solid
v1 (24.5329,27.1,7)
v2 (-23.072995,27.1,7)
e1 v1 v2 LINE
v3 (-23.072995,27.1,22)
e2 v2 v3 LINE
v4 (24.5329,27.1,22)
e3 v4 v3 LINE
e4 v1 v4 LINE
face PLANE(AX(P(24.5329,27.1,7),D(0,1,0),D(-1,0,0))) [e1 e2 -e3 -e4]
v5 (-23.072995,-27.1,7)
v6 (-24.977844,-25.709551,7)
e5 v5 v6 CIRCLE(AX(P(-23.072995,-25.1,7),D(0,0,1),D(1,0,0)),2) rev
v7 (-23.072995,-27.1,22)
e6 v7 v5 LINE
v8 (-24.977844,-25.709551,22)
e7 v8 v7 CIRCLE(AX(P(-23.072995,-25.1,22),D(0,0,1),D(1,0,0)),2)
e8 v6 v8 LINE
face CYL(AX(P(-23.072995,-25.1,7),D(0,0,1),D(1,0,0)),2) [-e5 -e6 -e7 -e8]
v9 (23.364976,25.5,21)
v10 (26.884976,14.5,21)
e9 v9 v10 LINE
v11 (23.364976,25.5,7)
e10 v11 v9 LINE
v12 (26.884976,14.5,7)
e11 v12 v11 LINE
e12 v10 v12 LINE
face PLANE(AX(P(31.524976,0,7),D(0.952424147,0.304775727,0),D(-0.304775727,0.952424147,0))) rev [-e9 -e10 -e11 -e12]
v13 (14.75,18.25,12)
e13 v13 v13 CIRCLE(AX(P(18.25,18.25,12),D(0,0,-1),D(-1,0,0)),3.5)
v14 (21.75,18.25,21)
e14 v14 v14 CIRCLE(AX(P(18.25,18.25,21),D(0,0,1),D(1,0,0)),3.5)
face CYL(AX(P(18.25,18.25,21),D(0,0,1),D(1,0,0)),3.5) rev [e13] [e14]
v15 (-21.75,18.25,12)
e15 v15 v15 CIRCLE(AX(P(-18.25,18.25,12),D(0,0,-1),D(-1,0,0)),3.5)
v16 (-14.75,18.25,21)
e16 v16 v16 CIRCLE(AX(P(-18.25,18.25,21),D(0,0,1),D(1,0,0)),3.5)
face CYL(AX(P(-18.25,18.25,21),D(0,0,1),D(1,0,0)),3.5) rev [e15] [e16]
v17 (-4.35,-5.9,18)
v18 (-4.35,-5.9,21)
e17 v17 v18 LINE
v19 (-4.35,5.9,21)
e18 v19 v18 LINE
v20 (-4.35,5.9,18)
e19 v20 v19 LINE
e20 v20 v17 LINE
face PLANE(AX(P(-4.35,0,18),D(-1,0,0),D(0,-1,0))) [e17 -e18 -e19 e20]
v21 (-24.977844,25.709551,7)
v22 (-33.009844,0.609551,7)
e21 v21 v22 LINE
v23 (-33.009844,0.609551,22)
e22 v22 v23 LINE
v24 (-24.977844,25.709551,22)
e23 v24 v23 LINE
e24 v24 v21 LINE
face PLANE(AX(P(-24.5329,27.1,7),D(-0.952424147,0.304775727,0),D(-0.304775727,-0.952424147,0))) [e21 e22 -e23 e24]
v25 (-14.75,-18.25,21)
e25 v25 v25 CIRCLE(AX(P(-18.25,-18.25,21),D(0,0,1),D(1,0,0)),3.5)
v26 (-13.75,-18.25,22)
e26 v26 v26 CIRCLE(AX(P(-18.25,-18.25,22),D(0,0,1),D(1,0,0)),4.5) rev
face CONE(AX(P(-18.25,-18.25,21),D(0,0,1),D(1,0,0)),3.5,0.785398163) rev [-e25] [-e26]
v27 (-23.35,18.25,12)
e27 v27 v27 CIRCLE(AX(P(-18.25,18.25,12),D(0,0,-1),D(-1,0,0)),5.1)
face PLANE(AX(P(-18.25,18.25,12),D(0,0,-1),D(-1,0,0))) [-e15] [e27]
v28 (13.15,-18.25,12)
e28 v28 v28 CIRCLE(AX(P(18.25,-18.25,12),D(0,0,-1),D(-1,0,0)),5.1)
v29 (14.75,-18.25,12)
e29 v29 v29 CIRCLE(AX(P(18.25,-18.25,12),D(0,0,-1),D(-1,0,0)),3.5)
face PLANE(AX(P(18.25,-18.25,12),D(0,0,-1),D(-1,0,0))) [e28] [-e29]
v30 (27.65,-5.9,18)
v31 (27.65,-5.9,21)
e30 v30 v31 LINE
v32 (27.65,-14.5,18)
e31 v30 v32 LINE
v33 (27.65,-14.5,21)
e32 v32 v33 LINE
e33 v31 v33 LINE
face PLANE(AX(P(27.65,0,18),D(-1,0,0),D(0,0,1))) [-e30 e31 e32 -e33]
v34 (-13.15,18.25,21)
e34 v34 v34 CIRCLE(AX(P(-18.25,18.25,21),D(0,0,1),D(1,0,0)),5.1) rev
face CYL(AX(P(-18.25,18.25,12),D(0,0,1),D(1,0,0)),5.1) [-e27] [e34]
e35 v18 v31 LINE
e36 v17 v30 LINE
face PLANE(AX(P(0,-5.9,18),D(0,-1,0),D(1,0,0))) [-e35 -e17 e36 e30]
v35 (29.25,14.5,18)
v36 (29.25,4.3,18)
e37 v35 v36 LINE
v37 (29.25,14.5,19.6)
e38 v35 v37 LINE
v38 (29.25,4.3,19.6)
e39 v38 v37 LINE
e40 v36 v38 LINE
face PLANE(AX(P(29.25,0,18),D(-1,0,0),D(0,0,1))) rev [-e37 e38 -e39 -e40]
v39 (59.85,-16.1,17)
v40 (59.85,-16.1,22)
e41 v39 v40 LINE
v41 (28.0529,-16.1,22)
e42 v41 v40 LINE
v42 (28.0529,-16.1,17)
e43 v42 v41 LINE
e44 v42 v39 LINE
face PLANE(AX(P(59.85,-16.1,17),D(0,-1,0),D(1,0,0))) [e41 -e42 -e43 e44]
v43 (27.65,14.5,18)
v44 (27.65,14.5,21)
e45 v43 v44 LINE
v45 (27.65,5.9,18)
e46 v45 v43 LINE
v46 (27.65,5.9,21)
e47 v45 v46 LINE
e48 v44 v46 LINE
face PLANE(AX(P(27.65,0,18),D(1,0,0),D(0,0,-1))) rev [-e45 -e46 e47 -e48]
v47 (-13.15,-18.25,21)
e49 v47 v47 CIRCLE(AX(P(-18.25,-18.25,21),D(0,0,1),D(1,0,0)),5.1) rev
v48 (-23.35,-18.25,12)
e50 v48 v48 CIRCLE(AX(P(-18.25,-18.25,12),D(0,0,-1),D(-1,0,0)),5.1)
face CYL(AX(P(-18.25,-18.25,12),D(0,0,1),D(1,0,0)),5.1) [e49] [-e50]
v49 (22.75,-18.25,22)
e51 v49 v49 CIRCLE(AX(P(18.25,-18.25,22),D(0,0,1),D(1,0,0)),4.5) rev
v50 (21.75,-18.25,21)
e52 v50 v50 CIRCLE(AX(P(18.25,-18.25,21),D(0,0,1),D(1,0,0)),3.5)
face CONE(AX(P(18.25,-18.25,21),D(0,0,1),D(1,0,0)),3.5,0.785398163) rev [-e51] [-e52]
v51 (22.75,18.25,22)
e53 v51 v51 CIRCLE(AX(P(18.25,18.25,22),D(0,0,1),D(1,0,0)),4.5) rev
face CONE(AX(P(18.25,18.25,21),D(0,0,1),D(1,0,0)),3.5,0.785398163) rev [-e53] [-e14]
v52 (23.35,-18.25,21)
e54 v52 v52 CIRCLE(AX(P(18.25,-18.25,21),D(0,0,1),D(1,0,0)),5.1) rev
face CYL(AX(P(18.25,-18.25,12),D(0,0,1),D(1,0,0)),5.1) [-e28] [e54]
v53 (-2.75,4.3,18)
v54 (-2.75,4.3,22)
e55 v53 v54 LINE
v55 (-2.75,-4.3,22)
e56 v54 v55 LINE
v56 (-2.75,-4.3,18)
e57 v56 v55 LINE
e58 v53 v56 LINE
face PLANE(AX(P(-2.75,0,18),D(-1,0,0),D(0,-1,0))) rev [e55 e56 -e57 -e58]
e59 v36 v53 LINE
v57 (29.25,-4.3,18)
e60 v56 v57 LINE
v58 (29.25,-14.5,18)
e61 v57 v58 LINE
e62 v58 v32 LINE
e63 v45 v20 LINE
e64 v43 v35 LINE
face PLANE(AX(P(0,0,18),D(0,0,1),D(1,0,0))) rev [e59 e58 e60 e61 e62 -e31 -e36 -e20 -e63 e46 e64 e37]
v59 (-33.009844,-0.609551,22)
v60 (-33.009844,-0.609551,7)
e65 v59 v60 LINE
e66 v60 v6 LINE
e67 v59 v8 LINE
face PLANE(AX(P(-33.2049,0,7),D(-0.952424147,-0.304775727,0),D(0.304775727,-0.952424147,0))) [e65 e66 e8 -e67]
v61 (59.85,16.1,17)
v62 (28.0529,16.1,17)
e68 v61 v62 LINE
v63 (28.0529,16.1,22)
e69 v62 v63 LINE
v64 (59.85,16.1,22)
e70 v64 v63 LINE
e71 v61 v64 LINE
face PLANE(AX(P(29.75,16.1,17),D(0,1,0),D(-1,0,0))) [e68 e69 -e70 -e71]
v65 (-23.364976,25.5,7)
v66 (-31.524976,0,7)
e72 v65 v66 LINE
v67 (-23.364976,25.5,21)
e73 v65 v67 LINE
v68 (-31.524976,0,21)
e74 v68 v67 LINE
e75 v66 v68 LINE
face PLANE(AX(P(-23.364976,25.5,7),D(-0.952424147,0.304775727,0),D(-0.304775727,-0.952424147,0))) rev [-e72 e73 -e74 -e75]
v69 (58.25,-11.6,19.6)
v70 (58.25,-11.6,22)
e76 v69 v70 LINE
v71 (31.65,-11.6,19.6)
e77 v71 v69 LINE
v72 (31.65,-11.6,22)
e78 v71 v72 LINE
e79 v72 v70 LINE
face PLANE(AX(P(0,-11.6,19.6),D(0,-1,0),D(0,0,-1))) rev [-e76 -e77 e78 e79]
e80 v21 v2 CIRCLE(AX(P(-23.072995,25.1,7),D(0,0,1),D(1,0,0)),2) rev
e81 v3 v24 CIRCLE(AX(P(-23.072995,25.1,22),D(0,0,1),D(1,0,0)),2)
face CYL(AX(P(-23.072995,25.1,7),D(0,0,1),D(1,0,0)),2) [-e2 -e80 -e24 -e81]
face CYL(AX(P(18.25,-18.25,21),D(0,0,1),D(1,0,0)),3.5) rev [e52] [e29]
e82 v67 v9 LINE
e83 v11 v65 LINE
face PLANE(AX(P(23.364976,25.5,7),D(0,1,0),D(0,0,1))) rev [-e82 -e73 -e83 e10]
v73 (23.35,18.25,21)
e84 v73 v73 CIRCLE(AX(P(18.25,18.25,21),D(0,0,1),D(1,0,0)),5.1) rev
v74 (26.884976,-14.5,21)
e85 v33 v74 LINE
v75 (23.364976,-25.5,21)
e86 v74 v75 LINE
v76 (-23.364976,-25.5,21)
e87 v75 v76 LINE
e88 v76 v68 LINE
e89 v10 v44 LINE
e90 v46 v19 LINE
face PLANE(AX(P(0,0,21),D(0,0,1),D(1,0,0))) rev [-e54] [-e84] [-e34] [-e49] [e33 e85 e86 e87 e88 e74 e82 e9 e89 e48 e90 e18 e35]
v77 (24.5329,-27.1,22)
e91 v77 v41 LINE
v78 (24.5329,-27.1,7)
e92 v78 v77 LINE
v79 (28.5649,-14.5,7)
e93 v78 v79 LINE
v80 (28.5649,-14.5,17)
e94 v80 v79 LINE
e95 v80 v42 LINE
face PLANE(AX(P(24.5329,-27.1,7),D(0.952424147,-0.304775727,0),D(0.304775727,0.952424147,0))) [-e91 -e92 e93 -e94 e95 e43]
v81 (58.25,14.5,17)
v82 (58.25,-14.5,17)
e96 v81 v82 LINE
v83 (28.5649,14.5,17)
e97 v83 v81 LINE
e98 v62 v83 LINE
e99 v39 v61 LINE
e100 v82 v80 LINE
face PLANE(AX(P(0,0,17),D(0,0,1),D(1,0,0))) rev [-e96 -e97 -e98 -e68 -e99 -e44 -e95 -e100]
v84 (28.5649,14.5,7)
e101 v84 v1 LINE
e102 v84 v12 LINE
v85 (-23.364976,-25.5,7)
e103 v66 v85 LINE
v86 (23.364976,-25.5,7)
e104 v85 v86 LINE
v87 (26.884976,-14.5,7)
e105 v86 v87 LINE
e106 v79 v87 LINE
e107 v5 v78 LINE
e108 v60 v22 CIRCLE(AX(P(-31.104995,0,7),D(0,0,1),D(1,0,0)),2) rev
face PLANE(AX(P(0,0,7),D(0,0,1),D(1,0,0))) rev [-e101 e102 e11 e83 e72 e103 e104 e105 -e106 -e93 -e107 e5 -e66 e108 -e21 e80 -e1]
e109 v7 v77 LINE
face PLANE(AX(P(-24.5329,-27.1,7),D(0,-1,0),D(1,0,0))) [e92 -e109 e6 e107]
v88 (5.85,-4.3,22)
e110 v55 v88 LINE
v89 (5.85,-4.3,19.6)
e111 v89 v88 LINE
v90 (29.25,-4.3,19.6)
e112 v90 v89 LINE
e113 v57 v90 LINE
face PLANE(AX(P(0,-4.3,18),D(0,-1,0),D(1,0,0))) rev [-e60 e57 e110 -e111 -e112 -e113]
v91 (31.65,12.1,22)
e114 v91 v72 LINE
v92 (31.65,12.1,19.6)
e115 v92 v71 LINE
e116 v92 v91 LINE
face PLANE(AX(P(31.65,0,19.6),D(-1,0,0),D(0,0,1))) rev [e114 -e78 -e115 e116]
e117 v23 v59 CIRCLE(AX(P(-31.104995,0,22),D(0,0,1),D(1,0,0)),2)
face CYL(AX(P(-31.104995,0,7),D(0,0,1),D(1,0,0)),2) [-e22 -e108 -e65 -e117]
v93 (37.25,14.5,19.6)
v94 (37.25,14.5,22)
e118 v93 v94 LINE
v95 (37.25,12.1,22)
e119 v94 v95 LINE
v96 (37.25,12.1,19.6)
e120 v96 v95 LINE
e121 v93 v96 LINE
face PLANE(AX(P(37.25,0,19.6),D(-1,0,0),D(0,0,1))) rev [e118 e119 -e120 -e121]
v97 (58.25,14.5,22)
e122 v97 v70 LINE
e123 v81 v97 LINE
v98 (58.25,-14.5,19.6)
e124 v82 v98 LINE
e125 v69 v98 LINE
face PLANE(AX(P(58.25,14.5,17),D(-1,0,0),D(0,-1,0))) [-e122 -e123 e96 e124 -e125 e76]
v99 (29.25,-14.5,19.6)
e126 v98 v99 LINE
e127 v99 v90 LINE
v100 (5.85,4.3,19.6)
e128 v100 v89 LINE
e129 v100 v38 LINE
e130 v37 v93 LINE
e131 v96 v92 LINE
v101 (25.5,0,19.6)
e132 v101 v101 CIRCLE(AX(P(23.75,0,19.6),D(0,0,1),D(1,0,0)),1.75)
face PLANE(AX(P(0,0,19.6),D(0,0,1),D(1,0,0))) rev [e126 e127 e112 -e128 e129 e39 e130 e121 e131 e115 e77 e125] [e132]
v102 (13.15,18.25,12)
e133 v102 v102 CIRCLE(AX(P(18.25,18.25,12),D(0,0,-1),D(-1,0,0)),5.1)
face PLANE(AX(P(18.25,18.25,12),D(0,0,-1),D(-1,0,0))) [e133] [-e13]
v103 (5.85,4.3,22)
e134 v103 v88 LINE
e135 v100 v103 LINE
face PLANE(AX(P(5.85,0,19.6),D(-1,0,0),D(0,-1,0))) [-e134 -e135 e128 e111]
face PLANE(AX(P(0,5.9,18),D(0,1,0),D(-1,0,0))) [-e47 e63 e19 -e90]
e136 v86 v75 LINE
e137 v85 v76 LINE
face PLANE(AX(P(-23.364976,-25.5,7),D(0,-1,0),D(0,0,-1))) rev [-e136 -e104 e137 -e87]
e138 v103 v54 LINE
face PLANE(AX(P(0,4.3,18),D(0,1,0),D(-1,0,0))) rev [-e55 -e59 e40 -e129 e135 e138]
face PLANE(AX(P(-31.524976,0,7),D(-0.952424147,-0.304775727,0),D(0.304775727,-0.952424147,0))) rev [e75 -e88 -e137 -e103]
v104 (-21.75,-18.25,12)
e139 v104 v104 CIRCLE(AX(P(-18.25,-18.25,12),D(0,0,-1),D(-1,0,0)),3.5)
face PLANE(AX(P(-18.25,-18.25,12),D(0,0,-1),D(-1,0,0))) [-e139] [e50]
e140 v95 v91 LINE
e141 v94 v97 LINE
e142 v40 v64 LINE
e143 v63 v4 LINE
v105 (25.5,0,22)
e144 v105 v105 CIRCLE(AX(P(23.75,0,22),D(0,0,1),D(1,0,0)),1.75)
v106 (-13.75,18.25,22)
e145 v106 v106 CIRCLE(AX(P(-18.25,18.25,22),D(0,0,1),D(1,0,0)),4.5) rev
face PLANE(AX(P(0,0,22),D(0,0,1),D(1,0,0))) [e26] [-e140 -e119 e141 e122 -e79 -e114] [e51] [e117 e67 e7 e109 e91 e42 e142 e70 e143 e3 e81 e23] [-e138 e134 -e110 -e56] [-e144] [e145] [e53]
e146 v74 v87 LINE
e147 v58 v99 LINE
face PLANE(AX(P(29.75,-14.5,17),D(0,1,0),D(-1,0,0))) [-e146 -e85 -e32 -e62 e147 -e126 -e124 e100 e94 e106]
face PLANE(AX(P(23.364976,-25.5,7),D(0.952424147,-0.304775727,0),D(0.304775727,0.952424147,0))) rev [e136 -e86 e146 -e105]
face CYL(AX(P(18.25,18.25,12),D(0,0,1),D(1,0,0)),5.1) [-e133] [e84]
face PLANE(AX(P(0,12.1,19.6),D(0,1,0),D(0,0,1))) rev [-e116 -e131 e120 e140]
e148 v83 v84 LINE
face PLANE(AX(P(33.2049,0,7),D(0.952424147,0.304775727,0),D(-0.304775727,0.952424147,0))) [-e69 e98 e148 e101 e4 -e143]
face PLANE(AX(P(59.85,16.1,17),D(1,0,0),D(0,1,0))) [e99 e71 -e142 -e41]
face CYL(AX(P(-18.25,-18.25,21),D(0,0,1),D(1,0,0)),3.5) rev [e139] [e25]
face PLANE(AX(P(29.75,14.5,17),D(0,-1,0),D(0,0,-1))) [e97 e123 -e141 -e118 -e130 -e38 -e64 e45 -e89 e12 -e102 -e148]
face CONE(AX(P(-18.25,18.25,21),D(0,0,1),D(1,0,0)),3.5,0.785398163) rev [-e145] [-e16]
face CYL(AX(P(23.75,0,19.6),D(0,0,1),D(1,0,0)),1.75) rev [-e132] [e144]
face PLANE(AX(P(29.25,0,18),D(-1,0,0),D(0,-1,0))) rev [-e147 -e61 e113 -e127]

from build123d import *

# Parameters (mm, degrees)
BOSS_EXTRUDE1_DEPTH      = 10
BOSS_EXTRUDE1_DEPTH_BACK = 5
BOSS_EXTRUDE2_DEPTH      = 5
CUT_EXTRUDE1_DEPTH       = 68.390151358
BOSS_EXTRUDE3_DEPTH      = 4
SKETCH7_R                = 1.75
BOSS_EXTRUDE4_DEPTH      = 2.4
SKETCH8_R                = 3.5
BOSS_EXTRUDE5_DEPTH      = 1
SKETCH9_R                = 5.1
SKETCH9_R_2              = 3.5
BOSS_EXTRUDE6_DEPTH      = 9
CHAMFER1_SIZE            = 1
FILLET1_R                = 2


with BuildPart() as part:
    # Sketch2 → Boss-Extrude1 (new, two sides: drawn at the far end of the back side and taken through both)
    with BuildSketch(Plane.XY.offset(12).offset(-BOSS_EXTRUDE1_DEPTH_BACK)):
        Polygon((-24.532899998, 27.1), (-33.204899998, 0), (-24.532899998, -27.1), (24.532899998, -27.1), (33.204899998, 0), (24.532899998, 27.1), align=None)
        Polygon((-23.36497619, 25.5), (-31.52497619, 0), (-23.36497619, -25.5), (23.36497619, -25.5), (31.52497619, 0), (23.36497619, 25.5), align=None, mode=Mode.SUBTRACT)
    extrude(amount=BOSS_EXTRUDE1_DEPTH + BOSS_EXTRUDE1_DEPTH_BACK)

    # Sketch3 → Boss-Extrude2 (add)
    with BuildSketch(Plane.XY.offset(22)):
        Polygon((29.75, 16.1), (59.85, 16.1), (59.85, -16.1), (29.75, -16.1), (28.052899998, -16.1), (28.564899998, -14.5), (29.75, -14.5), (58.25, -14.5), (58.25, 14.5), (29.75, 14.5), (28.564899998, 14.5), (28.052899998, 16.1), align=None)
    extrude(amount=-BOSS_EXTRUDE2_DEPTH)

    # Sketch4 → Cut-Extrude1 (cut, through all)
    with BuildSketch(Plane(origin=(0, 0, 7), x_dir=(-1, 0, 0), z_dir=(0, 0, -1))):
        Polygon((-26.88497619, 14.5), (-28.564899998, 14.5), (-33.204899998, 0), (-28.564899998, -14.5), (-26.88497619, -14.5), (-31.52497619, 0), align=None)
    extrude(amount=-CUT_EXTRUDE1_DEPTH, mode=Mode.SUBTRACT)

    # Sketch5 → Boss-Extrude3 (add)
    with BuildSketch(Plane.XY.offset(22)):
        Polygon((29.25, 4.3), (29.25, 14), (29.25, 14.5), (27.65, 14.5), (27.65, 14), (27.65, 5.9), (-4.35, 5.9), (-4.35, -5.9), (27.65, -5.9), (27.65, -14), (27.65, -14.5), (29.25, -14.5), (29.25, -14), (29.25, -4.3), (-2.75, -4.3), (-2.75, 4.3), align=None)
    extrude(amount=-BOSS_EXTRUDE3_DEPTH)

    # Sketch7 → Boss-Extrude4 (add)
    with BuildSketch(Plane.XY.offset(22)):
        Polygon((37.25, 12.1), (37.25, 14.5), (29.25, 14.5), (29.25, 4.3), (5.85, 4.3), (5.85, -4.3), (29.25, -4.3), (29.25, -14.5), (58.25, -14.5), (58.25, -11.6), (31.65, -11.6), (31.65, 12.1), align=None)
        with Locations((23.75, 0)):
            Circle(SKETCH7_R, mode=Mode.SUBTRACT)
    extrude(amount=-BOSS_EXTRUDE4_DEPTH)

    # Sketch8 → Boss-Extrude5 (add)
    with BuildSketch(Plane.XY.offset(22)):
        Polygon((27.65, -5.9), (27.65, -14.5), (26.88497619, -14.5), (23.36497619, -25.5), (-23.36497619, -25.5), (-31.52497619, 0), (-23.36497619, 25.5), (23.36497619, 25.5), (26.88497619, 14.5), (27.65, 14.5), (27.65, 5.9), (-4.35, 5.9), (-4.35, -5.9), align=None)
        with Locations((-18.25, 18.25)):
            Circle(SKETCH8_R, mode=Mode.SUBTRACT)
        with Locations((18.25, 18.25)):
            Circle(SKETCH8_R, mode=Mode.SUBTRACT)
        with Locations((18.25, -18.25)):
            Circle(SKETCH8_R, mode=Mode.SUBTRACT)
        with Locations((-18.25, -18.25)):
            Circle(SKETCH8_R, mode=Mode.SUBTRACT)
    extrude(amount=-BOSS_EXTRUDE5_DEPTH)

    # Sketch9 → Boss-Extrude6 (add)
    # profile 1 of 4: a face of its own
    with BuildSketch(Plane(origin=(0, 0, 21), x_dir=(-1, 0, 0), z_dir=(0, 0, -1))):
        with Locations(Location((-18.25, 18.25, 0), (0, 0, 180))):
            Circle(SKETCH9_R)
        with Locations(Location((-18.25, 18.25, 0), (0, 0, 180))):
            Circle(SKETCH9_R_2, mode=Mode.SUBTRACT)
    # profile 2 of 4: a face of its own
    with BuildSketch(Plane(origin=(0, 0, 21), x_dir=(-1, 0, 0), z_dir=(0, 0, -1))):
        with Locations(Location((18.25, 18.25, 0), (0, 0, 180))):
            Circle(SKETCH9_R)
        with Locations(Location((18.25, 18.25, 0), (0, 0, 180))):
            Circle(SKETCH9_R_2, mode=Mode.SUBTRACT)
    # profile 3 of 4: a face of its own
    with BuildSketch(Plane(origin=(0, 0, 21), x_dir=(-1, 0, 0), z_dir=(0, 0, -1))):
        with Locations(Location((18.25, -18.25, 0), (0, 0, 180))):
            Circle(SKETCH9_R)
        with Locations(Location((18.25, -18.25, 0), (0, 0, 180))):
            Circle(SKETCH9_R_2, mode=Mode.SUBTRACT)
    # profile 4 of 4: a face of its own
    with BuildSketch(Plane(origin=(0, 0, 21), x_dir=(-1, 0, 0), z_dir=(0, 0, -1))):
        with Locations(Location((-18.25, -18.25, 0), (0, 0, 180))):
            Circle(SKETCH9_R)
        with Locations(Location((-18.25, -18.25, 0), (0, 0, 180))):
            Circle(SKETCH9_R_2, mode=Mode.SUBTRACT)
    extrude(amount=BOSS_EXTRUDE6_DEPTH)

    # Chamfer1
    chamfer1_edges = [part.edges().sort_by_distance(p)[0] for p in [
        (-21.75, -18.25, 22),
        (14.75, -18.25, 22),
        (14.75, 18.25, 22),
        (-21.75, 18.25, 22),
    ]]
    chamfer(chamfer1_edges, length=CHAMFER1_SIZE - 0.0001)  # a hair under: the kernel refuses the full size

    # Fillet1
    fillet1_edges = [part.edges().sort_by_distance(p)[0] for p in [
        (-24.532899998, -27.1, 14.5),
        (-33.204899998, 0, 14.5),
        (-24.532899998, 27.1, 14.5),
    ]]
    fillet(fillet1_edges, radius=FILLET1_R)


solid = part.part
